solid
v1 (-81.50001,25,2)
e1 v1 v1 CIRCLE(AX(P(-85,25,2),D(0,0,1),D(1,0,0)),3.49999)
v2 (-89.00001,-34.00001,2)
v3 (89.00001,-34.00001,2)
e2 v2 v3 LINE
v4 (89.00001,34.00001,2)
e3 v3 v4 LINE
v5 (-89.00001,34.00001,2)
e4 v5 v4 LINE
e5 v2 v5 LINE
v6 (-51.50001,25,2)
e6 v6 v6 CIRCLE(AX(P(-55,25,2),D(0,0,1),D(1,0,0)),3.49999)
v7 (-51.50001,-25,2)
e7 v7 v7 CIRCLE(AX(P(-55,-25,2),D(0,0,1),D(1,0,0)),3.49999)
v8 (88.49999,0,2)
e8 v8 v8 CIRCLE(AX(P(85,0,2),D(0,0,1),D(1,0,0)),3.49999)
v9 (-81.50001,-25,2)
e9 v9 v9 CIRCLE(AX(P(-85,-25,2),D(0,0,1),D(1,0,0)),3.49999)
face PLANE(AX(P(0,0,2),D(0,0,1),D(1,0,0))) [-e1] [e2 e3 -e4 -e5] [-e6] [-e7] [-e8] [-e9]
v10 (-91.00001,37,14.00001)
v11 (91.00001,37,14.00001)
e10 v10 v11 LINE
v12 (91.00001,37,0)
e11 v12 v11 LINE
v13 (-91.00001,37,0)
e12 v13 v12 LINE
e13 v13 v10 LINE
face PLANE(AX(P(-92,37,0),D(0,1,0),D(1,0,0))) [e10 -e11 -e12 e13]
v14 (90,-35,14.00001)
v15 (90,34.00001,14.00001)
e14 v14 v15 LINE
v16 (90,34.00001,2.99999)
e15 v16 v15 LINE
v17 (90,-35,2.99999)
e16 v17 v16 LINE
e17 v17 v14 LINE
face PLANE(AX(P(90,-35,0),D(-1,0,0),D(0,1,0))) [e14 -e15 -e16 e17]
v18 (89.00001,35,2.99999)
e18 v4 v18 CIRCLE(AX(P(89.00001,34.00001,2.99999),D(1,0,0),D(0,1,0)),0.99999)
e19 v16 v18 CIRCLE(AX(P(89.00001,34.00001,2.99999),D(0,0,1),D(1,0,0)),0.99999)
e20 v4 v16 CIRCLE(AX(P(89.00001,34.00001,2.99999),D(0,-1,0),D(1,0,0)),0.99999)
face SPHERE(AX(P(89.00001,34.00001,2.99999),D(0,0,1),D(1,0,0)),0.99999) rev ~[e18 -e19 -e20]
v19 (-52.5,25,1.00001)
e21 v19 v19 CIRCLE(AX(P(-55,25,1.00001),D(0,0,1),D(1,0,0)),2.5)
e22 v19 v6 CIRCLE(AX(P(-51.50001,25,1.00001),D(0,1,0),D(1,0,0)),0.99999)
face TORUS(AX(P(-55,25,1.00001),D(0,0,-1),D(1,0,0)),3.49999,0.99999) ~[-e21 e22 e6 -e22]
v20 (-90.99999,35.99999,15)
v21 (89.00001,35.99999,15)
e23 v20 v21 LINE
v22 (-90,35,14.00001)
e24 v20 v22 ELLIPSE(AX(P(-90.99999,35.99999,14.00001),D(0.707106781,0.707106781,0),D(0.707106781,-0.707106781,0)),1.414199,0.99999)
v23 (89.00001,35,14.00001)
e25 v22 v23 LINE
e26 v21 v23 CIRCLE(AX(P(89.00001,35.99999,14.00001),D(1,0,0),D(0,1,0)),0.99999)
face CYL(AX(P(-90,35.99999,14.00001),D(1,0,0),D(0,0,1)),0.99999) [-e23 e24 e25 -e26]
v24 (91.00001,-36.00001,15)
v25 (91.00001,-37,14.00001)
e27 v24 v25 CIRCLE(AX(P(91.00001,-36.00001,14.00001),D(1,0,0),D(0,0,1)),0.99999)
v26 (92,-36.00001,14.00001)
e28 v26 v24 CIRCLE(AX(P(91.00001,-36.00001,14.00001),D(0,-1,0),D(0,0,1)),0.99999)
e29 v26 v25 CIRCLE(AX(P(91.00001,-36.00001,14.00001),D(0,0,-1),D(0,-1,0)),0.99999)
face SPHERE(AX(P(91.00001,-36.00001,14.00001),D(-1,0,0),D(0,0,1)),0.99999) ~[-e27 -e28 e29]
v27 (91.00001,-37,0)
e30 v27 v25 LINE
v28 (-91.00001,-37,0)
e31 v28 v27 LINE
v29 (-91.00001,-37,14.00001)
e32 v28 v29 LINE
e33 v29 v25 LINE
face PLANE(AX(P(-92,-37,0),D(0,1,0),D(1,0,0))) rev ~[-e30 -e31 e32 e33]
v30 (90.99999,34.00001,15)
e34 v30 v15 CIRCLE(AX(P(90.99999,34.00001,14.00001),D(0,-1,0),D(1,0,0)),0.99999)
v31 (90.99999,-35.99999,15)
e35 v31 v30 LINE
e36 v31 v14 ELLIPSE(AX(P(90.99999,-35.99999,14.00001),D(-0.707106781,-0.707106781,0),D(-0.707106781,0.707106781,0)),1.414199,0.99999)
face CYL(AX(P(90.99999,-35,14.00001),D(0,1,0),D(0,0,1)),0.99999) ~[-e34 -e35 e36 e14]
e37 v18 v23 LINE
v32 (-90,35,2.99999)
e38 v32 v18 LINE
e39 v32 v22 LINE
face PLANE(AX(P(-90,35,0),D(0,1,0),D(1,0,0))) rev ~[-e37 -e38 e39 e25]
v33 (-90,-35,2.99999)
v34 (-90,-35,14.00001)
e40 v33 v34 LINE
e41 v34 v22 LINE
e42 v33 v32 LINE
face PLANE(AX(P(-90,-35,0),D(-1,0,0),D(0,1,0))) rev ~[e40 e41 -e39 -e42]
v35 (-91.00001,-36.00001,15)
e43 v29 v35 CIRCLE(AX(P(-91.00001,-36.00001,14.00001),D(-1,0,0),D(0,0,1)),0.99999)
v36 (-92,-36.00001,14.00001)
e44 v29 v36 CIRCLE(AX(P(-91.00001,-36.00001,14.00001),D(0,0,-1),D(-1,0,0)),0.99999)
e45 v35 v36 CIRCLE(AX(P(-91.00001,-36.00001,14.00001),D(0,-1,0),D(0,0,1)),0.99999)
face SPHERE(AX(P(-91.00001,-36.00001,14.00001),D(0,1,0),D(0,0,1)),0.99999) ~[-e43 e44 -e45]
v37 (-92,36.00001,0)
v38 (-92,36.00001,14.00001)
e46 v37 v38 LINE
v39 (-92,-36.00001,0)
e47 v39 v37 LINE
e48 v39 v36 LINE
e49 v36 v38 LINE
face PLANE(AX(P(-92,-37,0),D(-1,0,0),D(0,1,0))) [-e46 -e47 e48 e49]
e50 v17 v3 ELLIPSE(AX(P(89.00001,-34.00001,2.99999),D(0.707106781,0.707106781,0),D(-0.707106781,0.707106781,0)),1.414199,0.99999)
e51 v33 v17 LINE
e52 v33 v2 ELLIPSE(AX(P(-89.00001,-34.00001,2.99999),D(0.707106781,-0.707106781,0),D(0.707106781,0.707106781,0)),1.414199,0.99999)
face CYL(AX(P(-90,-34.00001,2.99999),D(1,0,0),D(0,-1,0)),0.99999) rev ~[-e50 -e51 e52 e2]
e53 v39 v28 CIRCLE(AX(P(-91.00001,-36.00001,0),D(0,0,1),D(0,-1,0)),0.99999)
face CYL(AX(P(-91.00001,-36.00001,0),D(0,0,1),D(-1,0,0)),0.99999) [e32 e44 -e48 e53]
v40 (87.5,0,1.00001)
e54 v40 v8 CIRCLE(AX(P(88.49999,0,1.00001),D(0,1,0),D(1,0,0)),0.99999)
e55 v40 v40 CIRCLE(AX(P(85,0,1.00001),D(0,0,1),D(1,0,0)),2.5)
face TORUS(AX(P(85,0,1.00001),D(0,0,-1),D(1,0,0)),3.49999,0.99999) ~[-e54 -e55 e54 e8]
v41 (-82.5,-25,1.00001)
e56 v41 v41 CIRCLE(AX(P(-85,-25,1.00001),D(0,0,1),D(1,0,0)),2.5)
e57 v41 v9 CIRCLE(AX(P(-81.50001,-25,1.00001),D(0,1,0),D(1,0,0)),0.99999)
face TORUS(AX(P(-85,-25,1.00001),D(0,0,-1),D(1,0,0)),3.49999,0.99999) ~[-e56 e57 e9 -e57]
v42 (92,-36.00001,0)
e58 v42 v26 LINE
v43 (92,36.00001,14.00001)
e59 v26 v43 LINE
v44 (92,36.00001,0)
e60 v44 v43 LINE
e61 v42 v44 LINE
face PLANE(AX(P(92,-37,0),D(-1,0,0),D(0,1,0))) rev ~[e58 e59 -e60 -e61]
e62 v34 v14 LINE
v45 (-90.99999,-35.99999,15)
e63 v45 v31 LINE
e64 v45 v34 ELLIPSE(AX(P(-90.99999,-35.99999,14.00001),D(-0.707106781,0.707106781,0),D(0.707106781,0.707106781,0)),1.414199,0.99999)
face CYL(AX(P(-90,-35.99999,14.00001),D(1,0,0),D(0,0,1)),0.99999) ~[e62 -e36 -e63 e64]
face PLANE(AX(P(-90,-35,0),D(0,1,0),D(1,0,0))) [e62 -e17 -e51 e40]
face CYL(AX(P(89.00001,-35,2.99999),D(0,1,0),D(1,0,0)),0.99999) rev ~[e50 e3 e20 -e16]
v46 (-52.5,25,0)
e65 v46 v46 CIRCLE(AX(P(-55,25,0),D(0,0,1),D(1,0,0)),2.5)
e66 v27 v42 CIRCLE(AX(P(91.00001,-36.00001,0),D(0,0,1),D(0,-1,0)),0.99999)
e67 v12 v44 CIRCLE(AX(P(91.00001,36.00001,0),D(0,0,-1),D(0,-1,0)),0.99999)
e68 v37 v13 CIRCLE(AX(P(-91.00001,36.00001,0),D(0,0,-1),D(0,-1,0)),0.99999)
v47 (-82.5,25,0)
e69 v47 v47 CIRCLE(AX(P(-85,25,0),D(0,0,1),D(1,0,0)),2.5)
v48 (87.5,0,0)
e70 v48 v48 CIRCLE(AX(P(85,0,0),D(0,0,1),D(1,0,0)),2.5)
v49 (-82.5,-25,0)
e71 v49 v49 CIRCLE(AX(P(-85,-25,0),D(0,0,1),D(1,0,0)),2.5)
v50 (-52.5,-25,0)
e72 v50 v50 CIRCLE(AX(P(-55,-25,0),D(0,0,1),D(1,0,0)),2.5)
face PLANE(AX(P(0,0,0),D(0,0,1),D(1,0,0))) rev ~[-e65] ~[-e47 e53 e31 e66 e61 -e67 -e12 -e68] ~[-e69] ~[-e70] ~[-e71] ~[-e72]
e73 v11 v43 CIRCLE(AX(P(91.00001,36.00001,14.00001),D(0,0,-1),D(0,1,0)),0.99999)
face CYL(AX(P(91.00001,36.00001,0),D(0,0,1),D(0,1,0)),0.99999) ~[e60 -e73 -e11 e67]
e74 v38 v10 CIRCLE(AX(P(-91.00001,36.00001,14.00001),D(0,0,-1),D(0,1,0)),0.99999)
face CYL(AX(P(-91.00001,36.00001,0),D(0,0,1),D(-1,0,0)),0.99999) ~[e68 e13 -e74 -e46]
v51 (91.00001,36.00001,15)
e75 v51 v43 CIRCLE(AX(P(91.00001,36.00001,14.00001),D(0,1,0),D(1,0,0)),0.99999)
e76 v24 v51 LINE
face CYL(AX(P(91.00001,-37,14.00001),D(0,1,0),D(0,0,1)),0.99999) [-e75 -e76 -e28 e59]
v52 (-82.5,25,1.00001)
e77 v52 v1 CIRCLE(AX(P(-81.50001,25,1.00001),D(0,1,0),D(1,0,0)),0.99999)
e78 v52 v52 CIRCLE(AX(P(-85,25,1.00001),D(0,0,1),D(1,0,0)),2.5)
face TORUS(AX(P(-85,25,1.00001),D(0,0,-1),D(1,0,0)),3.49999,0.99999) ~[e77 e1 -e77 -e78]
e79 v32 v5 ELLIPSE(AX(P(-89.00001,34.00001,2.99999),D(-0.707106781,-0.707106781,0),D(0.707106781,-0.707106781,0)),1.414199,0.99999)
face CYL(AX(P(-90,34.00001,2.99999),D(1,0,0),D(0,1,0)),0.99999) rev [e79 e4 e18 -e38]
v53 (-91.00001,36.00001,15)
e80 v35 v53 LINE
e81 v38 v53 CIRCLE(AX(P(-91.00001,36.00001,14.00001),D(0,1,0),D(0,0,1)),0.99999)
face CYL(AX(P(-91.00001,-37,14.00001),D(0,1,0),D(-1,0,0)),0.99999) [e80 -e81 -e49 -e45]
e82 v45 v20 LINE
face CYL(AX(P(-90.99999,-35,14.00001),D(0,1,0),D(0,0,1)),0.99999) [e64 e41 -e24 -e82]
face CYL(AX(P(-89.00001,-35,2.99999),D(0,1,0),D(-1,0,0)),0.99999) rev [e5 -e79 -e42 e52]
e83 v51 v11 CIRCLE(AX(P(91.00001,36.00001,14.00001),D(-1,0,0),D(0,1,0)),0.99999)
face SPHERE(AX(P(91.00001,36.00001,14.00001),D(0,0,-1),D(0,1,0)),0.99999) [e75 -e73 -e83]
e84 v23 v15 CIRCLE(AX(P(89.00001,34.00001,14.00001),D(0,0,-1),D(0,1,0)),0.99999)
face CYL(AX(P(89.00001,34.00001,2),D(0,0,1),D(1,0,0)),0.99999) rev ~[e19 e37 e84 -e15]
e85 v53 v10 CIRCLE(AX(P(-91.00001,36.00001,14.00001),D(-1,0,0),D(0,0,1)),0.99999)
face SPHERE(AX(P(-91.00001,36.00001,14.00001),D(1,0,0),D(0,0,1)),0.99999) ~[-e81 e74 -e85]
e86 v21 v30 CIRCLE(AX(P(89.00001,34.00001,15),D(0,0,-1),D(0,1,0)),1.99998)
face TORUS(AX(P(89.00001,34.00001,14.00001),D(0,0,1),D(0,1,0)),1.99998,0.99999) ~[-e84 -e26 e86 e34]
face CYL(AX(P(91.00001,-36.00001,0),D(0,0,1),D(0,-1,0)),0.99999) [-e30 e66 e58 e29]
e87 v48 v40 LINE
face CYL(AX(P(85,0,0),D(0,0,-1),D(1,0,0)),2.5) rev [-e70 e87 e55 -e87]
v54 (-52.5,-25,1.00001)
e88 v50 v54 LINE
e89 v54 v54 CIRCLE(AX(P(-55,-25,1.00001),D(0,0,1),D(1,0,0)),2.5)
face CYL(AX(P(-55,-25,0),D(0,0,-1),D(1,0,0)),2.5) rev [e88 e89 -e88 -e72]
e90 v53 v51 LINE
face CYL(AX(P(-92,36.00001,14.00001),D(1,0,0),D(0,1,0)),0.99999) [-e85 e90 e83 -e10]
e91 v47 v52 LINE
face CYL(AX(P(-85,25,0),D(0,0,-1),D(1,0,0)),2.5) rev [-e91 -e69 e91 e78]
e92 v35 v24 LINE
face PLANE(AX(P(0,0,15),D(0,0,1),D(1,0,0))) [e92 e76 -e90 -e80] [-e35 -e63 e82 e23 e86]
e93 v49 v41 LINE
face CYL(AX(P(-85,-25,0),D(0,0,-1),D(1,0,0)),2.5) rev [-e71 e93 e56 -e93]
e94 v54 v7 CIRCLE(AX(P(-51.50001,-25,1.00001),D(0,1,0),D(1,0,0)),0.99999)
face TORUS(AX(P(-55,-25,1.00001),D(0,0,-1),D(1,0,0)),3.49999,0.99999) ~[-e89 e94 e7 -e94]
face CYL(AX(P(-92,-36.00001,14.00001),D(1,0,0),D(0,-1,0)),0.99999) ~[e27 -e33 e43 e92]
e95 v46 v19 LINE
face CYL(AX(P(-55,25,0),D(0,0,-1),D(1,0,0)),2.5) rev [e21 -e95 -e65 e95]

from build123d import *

# Parameters (mm, degrees)
F0_W     = 180
F0_H     = 70
F0_R     = 2.5
F1_DEPTH = 2
F0_W_2   = 184
F0_H_2   = 74
F2_DEPTH = 15
F3_DEPTH = 25
F4_R     = 0.99999


# Not quite as in the source:
# - a fillet or chamfer is up to 0.001 mm smaller than in the source, because OpenCascade refuses the exact size
# - a feature names something its author has since deleted; it is built from what else it names


with BuildPart() as f1:
    # F0 (on Top) → F1 (new body)
    with BuildSketch(Plane.XY):
        Rectangle(F0_W, F0_H)
        with Locations((-85, -25)):
            Circle(F0_R, mode=Mode.SUBTRACT)
        with Locations((-55, -25)):
            Circle(F0_R, mode=Mode.SUBTRACT)
        with Locations((-85, 25)):
            Circle(F0_R, mode=Mode.SUBTRACT)
        with Locations((-55, 25)):
            Circle(F0_R, mode=Mode.SUBTRACT)
        with Locations((85, 0)):
            Circle(F0_R, mode=Mode.SUBTRACT)
    extrude(amount=F1_DEPTH)

    # F0 (on Top) → F2 (join)
    with BuildSketch(Plane.XY):
        Rectangle(F0_W_2, F0_H_2)
        Rectangle(F0_W, F0_H, mode=Mode.SUBTRACT)
    extrude(amount=F2_DEPTH)

    # F0 (on Top) → F3 (cut)
    with BuildSketch(Plane.XY):
        with Locations((-55, -25)):
            Circle(F0_R)
        with Locations((-85, -25)):
            Circle(F0_R)
        with Locations((-85, 25)):
            Circle(F0_R)
        with Locations((-55, 25)):
            Circle(F0_R)
    extrude(amount=-F3_DEPTH, mode=Mode.SUBTRACT)

    # F4 (radius 1 in the source; OpenCascade refuses exactly that, so slightly less here)
    f4_edges = [f1.edges().sort_by_distance(p)[0] for p in [
        (92, 37, 7.5),
        (90, 35, 8.5),
        (0, 37, 15),
        (-92, 0, 15),
        (0, -37, 15),
        (92, 0, 15),
        (0, 35, 15),
        (90, 0, 15),
        (0, -35, 15),
        (-90, 0, 15),
        (92, -37, 7.5),
        (-92, -37, 7.5),
        (-92, 37, 7.5),
        (90, 0, 2),
        (0, 35, 2),
        (-90, 0, 2),
        (0, -35, 2),
        (-87.5, -25, 2),
        (-57.5, -25, 2),
        (-87.5, 25, 2),
        (-57.5, 25, 2),
        (82.5, 0, 2),
    ]]
    fillet(f4_edges, radius=F4_R)


solid = f1.part
